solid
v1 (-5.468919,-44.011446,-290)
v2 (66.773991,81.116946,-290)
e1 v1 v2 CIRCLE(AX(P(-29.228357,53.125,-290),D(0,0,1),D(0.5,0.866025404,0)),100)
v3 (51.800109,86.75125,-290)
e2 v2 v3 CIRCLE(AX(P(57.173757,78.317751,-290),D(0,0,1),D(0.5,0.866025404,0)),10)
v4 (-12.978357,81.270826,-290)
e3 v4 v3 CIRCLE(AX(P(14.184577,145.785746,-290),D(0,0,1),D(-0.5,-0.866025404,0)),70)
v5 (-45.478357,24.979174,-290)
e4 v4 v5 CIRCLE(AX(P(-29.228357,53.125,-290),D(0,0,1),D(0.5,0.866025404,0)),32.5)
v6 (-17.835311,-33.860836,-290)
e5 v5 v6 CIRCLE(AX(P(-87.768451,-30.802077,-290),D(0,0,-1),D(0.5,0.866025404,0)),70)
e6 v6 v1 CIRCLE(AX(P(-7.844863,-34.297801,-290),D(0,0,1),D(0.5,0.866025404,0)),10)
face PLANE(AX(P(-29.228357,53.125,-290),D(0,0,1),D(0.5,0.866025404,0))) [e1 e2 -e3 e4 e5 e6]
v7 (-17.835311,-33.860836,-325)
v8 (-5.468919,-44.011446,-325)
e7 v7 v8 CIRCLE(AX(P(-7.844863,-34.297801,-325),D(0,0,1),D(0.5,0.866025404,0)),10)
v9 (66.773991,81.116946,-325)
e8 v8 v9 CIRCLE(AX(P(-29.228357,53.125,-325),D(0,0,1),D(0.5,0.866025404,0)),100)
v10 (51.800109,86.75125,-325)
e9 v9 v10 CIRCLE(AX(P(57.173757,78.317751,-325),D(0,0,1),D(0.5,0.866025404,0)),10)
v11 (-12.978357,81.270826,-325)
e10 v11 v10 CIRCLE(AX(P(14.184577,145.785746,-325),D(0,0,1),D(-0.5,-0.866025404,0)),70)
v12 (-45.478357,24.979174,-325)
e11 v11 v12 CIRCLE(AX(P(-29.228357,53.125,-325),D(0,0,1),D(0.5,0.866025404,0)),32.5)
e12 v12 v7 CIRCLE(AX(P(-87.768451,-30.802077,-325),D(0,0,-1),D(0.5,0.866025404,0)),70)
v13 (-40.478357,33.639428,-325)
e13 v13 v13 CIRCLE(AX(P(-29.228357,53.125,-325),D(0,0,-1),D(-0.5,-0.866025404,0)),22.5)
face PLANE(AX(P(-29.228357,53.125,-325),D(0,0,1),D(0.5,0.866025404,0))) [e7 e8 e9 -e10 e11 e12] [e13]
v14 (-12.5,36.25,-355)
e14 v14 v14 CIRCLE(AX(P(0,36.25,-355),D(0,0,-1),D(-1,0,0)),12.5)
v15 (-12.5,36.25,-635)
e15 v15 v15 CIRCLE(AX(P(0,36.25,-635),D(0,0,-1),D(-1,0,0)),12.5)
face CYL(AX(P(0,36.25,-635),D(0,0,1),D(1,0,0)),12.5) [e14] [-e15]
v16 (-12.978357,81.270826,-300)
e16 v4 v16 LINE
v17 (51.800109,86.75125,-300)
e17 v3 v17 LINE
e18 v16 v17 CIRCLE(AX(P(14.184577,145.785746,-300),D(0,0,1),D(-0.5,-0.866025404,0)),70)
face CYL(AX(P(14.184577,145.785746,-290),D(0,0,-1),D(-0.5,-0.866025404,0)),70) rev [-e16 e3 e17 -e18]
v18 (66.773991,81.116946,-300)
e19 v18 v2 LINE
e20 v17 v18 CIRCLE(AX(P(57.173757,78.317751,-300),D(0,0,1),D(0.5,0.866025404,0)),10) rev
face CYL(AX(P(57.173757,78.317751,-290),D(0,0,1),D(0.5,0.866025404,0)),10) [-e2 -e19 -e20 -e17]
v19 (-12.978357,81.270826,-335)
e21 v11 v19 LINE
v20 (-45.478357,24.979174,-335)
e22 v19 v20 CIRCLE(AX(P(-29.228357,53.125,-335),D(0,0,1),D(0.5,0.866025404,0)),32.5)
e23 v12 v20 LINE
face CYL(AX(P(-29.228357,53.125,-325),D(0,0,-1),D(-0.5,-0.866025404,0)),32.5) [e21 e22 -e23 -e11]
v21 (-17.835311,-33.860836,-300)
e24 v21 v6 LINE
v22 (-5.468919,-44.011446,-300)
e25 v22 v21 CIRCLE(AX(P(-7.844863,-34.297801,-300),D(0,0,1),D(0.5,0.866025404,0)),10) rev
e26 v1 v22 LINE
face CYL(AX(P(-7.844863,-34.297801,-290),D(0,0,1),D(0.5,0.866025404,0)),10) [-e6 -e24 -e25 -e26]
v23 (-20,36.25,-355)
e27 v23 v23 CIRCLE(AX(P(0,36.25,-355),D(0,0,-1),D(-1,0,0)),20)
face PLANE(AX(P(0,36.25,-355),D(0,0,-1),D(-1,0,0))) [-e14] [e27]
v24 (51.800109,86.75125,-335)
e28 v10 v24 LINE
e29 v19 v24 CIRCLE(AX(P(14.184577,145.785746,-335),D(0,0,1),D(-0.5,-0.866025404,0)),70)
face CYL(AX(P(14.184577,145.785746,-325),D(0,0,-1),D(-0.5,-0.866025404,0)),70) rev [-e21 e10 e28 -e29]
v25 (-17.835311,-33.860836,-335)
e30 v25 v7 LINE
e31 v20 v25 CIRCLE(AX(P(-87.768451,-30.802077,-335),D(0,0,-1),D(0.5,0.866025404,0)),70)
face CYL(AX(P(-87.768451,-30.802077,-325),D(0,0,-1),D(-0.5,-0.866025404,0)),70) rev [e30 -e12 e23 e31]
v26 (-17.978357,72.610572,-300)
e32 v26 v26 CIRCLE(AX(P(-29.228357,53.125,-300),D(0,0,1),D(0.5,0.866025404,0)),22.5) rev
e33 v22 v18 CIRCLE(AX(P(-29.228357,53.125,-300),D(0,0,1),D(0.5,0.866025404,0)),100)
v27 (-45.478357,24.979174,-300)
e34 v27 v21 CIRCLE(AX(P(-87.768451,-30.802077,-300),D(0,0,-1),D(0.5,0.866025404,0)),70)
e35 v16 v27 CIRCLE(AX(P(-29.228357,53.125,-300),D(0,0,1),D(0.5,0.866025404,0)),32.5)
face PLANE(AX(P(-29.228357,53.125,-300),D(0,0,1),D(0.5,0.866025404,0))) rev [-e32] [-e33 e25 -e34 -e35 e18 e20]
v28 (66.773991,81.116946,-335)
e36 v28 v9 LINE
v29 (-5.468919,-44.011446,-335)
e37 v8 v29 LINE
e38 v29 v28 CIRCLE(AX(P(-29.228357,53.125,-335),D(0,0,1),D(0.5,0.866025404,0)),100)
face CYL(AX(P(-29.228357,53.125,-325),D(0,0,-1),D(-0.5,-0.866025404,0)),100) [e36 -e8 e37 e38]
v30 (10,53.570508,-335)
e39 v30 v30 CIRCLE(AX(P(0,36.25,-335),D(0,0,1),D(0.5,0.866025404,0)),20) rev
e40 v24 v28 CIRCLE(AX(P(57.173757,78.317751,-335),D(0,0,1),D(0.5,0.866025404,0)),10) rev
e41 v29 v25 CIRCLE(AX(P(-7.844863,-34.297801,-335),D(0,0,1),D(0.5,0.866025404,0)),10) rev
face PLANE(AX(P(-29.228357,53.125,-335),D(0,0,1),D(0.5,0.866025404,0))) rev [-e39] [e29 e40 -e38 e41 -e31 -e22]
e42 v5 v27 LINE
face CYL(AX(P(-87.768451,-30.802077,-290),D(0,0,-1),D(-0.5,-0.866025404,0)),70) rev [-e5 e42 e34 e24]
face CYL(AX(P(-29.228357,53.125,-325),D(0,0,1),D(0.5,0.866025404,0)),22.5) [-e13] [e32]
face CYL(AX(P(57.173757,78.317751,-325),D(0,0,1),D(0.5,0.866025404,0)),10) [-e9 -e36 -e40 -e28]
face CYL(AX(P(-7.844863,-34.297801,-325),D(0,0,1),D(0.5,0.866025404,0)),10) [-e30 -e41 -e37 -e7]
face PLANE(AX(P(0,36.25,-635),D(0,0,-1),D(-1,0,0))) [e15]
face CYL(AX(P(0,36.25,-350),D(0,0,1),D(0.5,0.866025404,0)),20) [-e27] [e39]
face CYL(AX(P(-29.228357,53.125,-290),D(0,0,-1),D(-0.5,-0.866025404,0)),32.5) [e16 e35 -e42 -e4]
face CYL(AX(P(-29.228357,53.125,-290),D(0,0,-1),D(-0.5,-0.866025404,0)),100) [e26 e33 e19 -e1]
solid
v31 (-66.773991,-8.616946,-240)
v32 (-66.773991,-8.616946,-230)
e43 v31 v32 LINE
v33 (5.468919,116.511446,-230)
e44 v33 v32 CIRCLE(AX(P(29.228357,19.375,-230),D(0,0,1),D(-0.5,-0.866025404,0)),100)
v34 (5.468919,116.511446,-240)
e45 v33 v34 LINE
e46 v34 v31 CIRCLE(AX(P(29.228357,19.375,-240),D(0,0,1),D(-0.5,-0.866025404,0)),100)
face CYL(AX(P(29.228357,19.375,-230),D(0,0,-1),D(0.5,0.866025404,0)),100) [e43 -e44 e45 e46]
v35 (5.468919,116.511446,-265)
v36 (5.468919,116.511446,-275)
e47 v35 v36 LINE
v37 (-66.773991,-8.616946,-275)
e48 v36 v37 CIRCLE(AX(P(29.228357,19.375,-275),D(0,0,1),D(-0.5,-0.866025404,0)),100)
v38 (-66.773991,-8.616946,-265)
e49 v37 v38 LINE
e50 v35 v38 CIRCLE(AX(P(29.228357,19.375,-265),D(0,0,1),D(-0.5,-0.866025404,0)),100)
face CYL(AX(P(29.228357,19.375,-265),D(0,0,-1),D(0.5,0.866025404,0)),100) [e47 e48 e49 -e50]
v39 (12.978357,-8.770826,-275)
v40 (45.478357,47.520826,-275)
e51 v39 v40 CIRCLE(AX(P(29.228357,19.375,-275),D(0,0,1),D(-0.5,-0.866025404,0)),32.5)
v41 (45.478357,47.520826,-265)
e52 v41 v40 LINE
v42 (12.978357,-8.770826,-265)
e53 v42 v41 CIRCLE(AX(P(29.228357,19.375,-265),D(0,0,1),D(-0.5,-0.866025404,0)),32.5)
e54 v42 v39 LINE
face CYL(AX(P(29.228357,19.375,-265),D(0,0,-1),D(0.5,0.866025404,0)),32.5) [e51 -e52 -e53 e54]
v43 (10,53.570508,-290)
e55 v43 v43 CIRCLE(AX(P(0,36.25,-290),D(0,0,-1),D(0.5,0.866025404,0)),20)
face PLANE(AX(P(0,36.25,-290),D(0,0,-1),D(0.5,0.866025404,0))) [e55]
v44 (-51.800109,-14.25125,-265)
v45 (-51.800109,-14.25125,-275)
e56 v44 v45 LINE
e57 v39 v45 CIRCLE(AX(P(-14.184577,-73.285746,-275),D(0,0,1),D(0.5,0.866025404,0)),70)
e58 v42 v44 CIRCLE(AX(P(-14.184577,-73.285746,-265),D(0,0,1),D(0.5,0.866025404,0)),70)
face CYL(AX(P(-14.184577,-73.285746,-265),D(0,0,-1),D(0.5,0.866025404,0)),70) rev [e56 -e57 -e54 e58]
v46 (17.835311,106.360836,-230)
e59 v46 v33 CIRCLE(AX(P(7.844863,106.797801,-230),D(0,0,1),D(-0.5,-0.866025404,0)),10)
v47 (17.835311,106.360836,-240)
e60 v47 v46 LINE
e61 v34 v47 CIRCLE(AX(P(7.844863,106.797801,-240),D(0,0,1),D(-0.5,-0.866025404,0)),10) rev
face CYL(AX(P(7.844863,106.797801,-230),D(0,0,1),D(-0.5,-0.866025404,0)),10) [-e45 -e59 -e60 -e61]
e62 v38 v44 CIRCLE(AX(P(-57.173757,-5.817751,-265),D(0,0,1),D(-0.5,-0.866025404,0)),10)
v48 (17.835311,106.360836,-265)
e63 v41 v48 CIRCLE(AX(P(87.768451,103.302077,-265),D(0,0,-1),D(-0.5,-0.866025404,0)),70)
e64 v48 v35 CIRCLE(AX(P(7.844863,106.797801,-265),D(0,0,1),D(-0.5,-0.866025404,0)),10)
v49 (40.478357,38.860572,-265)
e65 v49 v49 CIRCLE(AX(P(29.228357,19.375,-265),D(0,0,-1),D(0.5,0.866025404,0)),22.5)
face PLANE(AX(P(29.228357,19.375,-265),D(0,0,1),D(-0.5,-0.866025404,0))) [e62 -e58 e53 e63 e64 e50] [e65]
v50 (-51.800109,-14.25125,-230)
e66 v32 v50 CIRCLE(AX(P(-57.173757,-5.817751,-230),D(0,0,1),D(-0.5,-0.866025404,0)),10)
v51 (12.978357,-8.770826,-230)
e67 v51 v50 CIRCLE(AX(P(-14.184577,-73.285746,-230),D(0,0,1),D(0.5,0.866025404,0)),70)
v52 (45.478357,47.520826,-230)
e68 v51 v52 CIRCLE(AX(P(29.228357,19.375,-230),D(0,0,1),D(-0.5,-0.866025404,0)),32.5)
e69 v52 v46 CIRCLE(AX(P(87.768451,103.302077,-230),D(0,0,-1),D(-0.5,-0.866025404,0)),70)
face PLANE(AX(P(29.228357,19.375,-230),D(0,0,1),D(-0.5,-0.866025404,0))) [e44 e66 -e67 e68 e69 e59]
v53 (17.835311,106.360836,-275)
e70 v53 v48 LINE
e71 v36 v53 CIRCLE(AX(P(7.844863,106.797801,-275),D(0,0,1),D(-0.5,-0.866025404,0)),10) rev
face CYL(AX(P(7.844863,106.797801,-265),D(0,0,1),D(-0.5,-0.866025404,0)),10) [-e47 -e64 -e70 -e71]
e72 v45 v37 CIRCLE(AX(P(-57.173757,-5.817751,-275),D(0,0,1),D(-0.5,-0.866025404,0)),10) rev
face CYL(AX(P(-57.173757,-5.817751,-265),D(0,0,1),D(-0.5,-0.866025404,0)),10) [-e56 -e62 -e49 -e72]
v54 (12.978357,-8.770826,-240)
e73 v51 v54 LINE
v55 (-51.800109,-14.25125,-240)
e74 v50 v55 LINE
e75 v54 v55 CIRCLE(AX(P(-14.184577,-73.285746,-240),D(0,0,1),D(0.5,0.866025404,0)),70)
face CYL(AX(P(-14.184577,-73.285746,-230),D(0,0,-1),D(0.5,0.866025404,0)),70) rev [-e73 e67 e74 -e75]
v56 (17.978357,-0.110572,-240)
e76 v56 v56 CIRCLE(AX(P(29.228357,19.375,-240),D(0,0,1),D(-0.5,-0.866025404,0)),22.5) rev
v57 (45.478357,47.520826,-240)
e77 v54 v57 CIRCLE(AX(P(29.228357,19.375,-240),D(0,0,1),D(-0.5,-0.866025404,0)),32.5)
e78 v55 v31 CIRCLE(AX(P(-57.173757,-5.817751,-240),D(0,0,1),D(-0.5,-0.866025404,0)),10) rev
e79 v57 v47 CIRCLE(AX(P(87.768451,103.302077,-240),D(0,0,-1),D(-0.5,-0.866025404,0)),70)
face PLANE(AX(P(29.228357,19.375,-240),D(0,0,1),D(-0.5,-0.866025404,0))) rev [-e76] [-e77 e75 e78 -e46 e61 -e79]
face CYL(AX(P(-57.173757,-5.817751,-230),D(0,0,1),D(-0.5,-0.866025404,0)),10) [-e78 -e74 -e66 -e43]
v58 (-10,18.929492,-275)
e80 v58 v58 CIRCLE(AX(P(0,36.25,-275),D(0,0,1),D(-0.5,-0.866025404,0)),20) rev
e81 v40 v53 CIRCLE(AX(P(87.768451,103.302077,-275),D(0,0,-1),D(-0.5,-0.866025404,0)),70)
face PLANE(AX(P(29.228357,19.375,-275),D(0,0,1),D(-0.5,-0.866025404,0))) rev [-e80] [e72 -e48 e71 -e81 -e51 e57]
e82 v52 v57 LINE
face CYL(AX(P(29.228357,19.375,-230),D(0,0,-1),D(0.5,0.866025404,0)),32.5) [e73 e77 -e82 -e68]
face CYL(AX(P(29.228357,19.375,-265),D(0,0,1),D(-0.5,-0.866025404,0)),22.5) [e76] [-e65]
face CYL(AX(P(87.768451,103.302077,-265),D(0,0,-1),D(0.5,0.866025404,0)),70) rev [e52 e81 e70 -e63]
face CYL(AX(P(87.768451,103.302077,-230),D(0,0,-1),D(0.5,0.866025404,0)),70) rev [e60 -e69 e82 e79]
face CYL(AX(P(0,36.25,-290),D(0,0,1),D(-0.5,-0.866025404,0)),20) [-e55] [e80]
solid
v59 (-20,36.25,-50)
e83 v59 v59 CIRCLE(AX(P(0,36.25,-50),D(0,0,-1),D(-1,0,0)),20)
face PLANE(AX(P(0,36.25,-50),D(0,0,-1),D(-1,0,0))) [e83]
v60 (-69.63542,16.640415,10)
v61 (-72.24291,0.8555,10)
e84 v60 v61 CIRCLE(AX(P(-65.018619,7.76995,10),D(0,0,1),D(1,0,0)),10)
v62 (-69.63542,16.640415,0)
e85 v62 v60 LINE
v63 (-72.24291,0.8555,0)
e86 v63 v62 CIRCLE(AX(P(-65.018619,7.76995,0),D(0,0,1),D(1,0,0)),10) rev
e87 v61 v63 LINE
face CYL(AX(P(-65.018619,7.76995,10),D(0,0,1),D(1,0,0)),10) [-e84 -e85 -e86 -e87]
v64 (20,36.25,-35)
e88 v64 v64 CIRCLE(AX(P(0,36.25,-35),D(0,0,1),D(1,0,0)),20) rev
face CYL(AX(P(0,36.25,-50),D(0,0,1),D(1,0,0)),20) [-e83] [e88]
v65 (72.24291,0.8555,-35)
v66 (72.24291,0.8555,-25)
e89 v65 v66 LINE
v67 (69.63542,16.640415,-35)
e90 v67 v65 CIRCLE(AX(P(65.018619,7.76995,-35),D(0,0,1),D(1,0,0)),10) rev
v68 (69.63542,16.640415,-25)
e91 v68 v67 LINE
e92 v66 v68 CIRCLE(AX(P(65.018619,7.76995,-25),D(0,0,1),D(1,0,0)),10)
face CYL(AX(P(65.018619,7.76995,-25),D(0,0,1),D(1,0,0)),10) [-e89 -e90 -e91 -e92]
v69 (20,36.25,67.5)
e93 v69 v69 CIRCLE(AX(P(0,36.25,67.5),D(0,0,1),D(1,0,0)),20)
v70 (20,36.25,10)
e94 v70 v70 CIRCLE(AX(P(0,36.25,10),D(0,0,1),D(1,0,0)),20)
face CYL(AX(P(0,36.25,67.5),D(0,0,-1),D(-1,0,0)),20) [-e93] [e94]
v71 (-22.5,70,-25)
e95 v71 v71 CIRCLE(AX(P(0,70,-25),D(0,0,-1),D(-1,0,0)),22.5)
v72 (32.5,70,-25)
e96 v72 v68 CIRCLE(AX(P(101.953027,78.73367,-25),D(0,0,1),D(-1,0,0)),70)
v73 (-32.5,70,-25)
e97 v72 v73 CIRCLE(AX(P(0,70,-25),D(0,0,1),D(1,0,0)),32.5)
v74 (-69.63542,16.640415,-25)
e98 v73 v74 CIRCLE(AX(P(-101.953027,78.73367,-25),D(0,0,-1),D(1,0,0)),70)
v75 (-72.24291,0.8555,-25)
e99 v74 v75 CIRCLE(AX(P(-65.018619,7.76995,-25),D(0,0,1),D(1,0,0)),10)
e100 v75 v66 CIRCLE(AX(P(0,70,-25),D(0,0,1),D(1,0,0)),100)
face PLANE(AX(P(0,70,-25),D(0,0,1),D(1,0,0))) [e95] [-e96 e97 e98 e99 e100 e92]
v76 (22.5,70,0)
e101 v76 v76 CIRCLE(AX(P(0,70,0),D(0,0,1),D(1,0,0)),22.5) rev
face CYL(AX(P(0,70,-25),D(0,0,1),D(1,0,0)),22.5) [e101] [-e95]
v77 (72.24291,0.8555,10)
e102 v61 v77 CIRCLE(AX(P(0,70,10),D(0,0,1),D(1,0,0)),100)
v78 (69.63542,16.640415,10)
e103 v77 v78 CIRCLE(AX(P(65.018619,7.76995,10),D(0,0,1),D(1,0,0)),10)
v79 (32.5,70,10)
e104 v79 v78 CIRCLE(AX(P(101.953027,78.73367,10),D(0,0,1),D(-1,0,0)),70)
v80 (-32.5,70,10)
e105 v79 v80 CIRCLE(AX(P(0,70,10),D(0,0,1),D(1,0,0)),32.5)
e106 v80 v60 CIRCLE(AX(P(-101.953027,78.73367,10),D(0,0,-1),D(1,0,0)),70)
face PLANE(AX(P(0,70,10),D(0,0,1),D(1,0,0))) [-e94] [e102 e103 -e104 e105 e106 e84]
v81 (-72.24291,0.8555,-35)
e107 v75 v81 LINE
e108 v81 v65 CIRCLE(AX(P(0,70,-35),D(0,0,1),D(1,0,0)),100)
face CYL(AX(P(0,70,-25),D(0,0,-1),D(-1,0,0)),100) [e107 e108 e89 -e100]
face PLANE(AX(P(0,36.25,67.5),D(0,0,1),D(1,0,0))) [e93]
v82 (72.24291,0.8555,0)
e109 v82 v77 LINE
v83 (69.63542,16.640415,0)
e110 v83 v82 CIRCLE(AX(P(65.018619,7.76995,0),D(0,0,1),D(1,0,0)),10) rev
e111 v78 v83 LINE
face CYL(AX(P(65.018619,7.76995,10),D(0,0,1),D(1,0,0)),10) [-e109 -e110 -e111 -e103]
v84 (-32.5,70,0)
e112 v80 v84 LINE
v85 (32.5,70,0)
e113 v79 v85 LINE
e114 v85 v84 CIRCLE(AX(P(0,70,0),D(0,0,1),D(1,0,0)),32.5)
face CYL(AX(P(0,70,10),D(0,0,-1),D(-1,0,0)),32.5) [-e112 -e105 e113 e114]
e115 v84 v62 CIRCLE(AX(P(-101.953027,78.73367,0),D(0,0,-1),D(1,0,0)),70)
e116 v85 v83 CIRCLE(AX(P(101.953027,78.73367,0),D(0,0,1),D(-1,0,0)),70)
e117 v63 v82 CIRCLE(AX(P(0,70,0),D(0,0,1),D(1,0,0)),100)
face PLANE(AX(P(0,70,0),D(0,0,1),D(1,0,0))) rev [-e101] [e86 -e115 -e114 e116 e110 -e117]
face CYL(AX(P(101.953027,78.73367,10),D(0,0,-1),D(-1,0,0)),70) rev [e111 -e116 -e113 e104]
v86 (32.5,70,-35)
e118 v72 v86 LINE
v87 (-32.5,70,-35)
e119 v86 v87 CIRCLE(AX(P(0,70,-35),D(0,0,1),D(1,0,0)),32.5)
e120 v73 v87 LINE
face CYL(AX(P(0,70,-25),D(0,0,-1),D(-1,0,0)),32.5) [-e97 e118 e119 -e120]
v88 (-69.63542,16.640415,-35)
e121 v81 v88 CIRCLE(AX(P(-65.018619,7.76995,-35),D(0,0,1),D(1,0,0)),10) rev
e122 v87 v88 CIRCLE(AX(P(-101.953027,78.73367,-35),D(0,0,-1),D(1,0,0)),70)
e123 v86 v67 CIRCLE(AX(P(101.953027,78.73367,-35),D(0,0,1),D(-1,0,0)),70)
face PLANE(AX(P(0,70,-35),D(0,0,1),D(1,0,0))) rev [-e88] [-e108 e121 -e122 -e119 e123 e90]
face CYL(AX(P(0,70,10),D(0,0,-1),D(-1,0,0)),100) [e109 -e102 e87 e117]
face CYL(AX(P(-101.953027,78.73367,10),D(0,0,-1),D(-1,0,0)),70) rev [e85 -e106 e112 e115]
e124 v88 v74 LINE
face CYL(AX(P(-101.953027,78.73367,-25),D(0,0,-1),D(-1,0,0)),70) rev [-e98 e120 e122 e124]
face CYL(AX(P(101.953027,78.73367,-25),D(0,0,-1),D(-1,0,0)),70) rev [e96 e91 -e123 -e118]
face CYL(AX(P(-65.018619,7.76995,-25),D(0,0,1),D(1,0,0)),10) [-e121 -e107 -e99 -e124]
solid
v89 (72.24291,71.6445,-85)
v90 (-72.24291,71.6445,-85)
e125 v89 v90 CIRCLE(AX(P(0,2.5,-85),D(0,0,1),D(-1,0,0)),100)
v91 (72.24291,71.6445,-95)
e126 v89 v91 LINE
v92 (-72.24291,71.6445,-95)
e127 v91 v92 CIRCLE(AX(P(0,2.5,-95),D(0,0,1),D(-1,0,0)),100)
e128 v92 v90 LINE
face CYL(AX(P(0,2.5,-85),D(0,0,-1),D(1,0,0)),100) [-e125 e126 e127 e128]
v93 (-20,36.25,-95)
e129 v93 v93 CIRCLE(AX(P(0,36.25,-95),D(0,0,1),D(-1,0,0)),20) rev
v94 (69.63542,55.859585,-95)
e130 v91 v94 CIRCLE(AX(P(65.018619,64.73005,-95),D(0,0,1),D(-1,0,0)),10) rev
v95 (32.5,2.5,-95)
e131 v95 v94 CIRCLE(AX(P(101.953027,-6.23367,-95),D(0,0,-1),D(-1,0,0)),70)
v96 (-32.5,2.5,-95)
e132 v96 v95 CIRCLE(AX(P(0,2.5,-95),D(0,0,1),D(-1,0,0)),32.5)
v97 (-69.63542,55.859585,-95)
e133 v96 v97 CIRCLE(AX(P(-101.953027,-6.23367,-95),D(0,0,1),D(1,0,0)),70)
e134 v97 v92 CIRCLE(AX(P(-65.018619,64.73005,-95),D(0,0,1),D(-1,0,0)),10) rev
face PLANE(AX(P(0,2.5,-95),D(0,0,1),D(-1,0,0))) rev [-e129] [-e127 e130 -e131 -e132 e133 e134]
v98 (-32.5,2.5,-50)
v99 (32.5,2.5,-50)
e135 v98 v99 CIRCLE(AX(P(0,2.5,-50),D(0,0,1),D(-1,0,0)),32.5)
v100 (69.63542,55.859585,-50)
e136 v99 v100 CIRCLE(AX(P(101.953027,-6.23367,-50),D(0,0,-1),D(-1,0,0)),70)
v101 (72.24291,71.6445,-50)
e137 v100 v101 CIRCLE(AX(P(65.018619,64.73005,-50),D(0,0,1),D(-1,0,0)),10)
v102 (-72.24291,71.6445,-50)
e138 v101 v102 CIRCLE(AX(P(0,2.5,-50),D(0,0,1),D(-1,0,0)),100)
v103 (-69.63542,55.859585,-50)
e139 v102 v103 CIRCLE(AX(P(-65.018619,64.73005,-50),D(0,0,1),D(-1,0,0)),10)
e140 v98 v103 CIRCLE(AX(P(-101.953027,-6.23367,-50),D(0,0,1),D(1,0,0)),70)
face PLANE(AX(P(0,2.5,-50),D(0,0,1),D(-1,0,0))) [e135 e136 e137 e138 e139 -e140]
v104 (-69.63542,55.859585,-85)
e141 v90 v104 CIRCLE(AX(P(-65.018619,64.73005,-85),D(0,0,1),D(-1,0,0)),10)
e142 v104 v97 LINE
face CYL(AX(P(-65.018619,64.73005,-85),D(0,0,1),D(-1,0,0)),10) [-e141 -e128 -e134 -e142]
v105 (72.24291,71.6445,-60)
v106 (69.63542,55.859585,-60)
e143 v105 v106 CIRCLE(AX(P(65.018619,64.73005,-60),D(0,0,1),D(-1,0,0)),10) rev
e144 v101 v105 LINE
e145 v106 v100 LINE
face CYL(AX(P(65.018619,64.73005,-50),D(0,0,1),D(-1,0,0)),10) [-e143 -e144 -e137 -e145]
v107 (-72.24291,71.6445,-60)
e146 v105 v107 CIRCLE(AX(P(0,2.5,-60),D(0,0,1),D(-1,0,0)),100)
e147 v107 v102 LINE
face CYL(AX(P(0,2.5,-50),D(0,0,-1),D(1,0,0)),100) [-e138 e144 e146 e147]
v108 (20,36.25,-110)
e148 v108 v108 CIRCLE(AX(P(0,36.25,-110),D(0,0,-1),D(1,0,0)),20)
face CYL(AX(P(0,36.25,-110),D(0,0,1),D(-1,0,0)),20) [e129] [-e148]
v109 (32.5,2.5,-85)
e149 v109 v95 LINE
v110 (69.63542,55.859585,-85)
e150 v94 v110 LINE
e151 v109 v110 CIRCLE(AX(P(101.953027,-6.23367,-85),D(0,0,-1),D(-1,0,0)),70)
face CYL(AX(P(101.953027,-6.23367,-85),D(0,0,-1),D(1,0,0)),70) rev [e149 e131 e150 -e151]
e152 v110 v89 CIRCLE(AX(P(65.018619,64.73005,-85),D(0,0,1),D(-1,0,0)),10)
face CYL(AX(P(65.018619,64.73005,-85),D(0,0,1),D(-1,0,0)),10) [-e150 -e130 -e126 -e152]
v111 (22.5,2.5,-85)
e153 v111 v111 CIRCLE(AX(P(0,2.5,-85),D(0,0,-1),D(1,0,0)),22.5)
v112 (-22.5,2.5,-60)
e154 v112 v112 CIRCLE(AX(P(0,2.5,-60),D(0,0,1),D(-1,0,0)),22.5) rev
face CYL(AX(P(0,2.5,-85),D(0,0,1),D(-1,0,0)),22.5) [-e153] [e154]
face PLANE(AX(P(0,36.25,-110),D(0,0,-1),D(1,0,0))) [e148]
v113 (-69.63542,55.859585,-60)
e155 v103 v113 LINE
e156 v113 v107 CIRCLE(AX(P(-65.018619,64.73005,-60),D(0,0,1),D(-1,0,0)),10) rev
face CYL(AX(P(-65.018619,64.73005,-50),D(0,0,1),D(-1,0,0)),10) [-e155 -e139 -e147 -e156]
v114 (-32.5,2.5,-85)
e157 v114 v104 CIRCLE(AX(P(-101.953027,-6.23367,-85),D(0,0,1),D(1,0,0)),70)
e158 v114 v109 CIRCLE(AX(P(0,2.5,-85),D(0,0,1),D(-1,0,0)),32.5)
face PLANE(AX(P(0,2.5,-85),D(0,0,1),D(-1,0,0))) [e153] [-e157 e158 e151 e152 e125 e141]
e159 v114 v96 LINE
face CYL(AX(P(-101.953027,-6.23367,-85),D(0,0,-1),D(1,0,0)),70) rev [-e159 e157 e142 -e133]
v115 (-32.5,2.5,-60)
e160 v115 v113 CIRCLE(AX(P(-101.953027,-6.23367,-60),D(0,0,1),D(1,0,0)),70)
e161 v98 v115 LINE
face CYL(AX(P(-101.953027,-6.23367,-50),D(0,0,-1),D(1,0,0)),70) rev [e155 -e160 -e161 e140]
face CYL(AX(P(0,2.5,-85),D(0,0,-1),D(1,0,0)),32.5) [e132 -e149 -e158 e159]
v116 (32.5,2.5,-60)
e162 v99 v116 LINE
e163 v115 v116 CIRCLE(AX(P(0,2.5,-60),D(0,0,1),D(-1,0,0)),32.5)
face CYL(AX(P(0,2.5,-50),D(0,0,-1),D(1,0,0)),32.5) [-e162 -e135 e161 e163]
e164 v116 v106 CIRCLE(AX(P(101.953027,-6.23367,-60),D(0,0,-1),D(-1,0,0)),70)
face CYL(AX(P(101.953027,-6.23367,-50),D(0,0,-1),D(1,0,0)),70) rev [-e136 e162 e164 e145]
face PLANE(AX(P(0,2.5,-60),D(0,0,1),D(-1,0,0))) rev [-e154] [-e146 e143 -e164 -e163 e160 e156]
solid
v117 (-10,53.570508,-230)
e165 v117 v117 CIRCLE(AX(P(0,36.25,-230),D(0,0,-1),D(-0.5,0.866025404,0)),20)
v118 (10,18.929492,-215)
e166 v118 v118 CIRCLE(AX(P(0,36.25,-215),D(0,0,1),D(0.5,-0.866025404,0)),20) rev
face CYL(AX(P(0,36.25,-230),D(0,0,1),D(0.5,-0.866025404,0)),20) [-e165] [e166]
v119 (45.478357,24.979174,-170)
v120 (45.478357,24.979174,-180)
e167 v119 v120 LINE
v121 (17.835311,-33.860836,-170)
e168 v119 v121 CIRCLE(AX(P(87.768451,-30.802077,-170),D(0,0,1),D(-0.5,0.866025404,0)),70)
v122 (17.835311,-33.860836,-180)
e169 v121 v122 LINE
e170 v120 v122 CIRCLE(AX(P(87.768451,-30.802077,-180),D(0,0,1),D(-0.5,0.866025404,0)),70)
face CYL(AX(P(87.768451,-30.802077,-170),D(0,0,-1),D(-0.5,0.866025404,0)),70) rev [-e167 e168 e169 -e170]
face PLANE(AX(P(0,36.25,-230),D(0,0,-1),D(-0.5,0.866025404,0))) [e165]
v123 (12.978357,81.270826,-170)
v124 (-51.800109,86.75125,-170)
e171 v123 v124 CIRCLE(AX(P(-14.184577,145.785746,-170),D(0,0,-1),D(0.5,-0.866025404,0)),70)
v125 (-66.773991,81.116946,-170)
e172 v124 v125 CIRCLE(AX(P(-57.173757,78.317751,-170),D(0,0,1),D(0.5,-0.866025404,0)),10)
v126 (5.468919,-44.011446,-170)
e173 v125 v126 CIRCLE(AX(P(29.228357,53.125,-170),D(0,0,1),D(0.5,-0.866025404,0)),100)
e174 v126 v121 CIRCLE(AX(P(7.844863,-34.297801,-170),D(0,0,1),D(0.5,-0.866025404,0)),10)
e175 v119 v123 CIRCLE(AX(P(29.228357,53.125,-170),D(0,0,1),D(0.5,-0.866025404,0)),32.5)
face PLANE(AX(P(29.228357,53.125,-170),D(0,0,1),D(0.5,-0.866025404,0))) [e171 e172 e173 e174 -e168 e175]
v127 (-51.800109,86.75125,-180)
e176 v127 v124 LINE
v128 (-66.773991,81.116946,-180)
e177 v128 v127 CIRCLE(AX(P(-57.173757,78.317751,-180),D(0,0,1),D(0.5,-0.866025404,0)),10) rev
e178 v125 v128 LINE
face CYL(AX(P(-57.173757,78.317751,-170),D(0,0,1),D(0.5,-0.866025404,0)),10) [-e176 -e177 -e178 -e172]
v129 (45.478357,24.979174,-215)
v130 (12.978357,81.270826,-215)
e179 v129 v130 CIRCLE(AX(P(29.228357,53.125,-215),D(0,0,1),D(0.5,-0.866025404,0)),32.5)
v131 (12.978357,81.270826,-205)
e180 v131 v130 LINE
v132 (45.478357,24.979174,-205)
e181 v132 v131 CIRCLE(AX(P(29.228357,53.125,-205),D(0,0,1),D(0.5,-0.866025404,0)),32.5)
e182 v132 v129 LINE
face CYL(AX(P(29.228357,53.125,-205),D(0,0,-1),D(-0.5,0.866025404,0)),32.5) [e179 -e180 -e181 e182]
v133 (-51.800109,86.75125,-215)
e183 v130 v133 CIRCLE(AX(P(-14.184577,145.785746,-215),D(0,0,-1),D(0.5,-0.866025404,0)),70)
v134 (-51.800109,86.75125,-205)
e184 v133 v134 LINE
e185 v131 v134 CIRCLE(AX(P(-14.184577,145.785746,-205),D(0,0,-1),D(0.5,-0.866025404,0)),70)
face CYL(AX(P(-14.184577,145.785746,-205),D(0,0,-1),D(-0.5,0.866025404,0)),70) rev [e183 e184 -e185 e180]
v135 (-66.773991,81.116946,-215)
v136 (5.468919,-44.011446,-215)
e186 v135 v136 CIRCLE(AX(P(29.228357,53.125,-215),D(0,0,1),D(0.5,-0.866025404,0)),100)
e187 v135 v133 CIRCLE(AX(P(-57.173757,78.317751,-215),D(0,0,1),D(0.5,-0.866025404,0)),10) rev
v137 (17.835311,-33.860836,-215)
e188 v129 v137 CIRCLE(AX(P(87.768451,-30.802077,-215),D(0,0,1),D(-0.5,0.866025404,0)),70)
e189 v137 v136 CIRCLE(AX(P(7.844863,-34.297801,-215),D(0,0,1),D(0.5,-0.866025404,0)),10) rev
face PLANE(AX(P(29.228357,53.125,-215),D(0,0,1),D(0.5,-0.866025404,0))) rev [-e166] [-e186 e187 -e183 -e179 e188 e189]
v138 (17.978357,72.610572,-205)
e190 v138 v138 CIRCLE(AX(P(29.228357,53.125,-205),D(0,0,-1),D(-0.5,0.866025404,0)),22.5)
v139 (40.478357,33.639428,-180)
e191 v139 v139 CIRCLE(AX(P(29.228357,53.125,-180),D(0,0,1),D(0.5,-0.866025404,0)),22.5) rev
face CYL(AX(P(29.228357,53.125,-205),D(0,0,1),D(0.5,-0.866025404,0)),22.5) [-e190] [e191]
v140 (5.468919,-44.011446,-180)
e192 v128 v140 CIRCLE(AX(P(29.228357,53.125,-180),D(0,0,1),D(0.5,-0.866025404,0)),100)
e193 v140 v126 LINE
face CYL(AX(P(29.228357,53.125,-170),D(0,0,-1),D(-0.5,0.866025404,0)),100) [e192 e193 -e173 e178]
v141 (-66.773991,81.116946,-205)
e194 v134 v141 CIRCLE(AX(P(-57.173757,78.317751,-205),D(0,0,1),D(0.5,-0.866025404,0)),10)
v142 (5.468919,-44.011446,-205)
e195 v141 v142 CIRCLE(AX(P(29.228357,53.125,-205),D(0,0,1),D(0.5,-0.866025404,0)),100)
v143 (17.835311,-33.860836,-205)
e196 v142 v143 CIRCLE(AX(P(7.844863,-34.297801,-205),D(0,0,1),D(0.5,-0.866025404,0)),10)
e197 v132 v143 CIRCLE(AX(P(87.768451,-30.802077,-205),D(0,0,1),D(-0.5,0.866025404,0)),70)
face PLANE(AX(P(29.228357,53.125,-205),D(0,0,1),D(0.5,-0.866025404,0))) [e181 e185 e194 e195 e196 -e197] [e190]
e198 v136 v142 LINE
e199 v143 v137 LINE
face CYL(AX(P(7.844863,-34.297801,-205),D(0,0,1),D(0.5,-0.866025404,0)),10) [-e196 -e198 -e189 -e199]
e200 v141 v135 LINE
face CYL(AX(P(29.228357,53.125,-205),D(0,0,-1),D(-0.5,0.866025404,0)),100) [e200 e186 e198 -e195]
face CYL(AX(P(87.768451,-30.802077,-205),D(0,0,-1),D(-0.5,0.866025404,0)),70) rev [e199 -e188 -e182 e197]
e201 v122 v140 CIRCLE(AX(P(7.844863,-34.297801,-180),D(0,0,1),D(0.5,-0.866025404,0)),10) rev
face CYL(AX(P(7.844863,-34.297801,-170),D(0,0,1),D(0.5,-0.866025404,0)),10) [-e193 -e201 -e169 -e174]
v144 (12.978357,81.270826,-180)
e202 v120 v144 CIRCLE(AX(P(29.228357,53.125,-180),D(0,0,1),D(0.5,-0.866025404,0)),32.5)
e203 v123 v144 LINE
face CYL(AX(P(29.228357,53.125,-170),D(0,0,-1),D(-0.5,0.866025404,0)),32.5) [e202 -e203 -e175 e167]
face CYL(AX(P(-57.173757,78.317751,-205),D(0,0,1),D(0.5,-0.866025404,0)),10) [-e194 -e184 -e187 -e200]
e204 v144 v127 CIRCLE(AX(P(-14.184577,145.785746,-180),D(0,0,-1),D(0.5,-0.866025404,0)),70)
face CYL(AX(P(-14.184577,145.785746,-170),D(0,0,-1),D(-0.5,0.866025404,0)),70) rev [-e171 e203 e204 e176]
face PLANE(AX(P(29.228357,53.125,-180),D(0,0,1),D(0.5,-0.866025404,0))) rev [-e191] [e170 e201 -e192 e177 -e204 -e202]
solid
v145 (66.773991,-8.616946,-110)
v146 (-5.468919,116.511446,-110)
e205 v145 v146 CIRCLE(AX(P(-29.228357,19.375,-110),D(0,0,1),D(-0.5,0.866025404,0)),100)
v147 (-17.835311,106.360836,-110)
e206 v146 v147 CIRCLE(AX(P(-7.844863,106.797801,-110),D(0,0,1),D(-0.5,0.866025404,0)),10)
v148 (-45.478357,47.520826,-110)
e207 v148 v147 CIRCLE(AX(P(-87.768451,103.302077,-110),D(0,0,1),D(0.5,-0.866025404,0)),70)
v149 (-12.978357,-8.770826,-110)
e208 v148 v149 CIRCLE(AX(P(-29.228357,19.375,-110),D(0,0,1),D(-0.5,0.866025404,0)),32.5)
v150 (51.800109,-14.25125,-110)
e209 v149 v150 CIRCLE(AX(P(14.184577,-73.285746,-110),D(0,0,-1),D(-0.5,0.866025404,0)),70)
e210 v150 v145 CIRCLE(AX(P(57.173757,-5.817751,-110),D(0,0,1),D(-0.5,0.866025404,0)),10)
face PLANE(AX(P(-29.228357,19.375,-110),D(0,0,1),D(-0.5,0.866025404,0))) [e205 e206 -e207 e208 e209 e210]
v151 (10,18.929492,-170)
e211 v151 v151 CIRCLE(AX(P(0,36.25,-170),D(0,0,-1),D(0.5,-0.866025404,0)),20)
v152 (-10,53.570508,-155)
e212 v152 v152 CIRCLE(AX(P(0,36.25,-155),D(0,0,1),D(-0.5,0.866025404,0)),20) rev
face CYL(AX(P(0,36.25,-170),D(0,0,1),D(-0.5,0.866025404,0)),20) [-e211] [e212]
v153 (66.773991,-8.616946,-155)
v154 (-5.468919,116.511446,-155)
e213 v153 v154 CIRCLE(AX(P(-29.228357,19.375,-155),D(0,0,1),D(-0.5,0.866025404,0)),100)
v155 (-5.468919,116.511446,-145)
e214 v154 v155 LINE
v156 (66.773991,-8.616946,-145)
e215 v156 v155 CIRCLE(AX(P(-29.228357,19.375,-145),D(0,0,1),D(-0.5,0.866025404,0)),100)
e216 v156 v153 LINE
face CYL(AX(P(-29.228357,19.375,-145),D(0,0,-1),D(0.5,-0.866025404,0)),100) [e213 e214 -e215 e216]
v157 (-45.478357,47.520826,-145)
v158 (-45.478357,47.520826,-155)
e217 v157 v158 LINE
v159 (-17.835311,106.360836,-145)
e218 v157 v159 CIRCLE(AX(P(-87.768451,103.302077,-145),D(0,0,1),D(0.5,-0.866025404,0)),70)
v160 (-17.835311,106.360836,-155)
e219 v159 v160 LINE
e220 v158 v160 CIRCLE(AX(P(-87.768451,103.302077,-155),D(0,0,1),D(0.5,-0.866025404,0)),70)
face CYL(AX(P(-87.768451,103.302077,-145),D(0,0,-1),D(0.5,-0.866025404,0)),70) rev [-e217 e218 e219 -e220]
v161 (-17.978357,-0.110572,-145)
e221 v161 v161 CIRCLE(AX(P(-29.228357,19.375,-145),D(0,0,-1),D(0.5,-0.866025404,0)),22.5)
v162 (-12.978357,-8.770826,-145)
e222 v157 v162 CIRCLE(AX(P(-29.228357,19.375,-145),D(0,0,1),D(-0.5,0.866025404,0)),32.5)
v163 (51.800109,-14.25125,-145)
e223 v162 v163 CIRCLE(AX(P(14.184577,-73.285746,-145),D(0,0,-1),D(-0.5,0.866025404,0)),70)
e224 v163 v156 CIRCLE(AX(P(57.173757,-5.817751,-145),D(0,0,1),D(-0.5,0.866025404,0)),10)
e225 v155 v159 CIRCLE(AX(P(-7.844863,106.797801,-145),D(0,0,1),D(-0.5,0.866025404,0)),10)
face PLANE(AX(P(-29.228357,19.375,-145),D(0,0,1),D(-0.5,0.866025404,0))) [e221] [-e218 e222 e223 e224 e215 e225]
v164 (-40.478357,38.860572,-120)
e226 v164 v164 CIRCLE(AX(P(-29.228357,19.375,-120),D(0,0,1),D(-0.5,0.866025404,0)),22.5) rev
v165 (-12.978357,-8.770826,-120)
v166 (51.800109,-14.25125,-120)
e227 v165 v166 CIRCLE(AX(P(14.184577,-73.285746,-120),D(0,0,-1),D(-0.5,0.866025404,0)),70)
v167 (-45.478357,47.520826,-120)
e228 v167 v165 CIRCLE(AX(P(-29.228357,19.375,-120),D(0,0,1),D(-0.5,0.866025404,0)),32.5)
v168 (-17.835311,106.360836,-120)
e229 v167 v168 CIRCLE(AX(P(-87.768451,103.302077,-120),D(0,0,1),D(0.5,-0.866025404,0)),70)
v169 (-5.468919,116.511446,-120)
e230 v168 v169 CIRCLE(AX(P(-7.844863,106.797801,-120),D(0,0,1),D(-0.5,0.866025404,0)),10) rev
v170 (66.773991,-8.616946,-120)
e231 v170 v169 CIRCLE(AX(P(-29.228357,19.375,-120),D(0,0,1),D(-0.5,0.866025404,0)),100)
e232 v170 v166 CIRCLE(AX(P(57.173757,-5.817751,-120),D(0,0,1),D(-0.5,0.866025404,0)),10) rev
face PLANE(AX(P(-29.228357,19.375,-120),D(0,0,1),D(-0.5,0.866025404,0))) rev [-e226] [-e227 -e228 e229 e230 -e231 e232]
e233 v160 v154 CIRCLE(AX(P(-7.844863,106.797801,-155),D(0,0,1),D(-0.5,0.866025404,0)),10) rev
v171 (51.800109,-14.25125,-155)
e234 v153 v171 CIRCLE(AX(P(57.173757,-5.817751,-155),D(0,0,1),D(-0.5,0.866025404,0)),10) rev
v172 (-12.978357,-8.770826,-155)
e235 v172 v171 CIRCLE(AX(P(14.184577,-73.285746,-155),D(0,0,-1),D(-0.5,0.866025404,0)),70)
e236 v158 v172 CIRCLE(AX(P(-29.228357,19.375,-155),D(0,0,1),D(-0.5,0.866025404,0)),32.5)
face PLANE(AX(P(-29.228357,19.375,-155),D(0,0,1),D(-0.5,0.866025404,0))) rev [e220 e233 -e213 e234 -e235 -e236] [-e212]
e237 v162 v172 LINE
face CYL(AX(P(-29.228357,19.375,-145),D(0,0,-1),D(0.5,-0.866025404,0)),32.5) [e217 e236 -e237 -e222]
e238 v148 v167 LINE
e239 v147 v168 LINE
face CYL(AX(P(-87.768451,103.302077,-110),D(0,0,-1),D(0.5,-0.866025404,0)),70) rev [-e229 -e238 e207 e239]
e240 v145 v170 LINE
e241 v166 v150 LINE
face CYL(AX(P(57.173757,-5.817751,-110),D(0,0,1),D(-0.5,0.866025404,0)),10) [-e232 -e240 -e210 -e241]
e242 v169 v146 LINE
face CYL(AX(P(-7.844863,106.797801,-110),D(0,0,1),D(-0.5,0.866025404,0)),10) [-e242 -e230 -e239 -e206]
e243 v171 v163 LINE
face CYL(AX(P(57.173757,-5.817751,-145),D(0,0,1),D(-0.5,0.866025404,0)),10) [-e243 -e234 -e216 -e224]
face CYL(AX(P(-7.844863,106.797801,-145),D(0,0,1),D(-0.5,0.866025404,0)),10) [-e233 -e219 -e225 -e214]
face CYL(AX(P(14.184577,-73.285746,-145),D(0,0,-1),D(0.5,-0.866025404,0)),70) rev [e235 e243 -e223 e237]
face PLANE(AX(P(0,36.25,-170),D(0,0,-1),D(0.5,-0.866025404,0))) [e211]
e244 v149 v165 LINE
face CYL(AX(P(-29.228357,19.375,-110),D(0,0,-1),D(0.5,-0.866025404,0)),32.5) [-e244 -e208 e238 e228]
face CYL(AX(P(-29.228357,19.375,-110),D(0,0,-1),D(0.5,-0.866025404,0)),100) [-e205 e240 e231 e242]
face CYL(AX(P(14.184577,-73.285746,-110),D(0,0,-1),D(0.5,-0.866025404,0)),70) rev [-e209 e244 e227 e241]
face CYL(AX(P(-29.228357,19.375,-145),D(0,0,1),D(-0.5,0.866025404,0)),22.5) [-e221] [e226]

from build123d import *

# Parameters (mm, degrees)
SALIENTE_EXTRUIR1_DEPTH           = 10
REDONDEO1_R                       = 10
CROQUIS2_R                        = 22.5
SALIENTE_EXTRUIR2_DEPTH           = 25
REDONDEO2_R                       = 10
REDONDEO3_R                       = 10
CROQUIS3_R                        = 20
SALIENTE_EXTRUIR3_DEPTH           = 15
S_LIDO_MOVER_COPIAR2_START        = -335
S_LIDO_MOVER_COPIAR2_DEPTH        = 10
S_LIDO_MOVER_COPIAR2_START_2      = -300
S_LIDO_MOVER_COPIAR2_2_DEPTH      = 10
S_LIDO_MOVER_COPIAR2_START_3      = -325
S_LIDO_MOVER_COPIAR2_3_OUTLINE_R  = 22.5
S_LIDO_MOVER_COPIAR2_3_DEPTH      = 25
S_LIDO_MOVER_COPIAR2_START_4      = -350
S_LIDO_MOVER_COPIAR2_4_OUTLINE_R  = 20
S_LIDO_MOVER_COPIAR2_4_DEPTH      = 15
S_LIDO_MOVER_COPIAR2_START_5      = -275
S_LIDO_MOVER_COPIAR2_5_DEPTH      = 10
S_LIDO_MOVER_COPIAR2_START_6      = -240
S_LIDO_MOVER_COPIAR2_6_DEPTH      = 10
S_LIDO_MOVER_COPIAR2_START_7      = -265
S_LIDO_MOVER_COPIAR2_7_OUTLINE_R  = 22.5
S_LIDO_MOVER_COPIAR2_7_DEPTH      = 25
S_LIDO_MOVER_COPIAR2_START_8      = -290
S_LIDO_MOVER_COPIAR2_8_OUTLINE_R  = 20
S_LIDO_MOVER_COPIAR2_8_DEPTH      = 15
S_LIDO_MOVER_COPIAR2_START_9      = -215
S_LIDO_MOVER_COPIAR2_9_DEPTH      = 10
S_LIDO_MOVER_COPIAR2_START_10     = -180
S_LIDO_MOVER_COPIAR2_10_DEPTH     = 10
S_LIDO_MOVER_COPIAR2_START_11     = -205
S_LIDO_MOVER_COPIAR2_11_OUTLINE_R = 22.5
S_LIDO_MOVER_COPIAR2_11_DEPTH     = 25
S_LIDO_MOVER_COPIAR2_START_12     = -230
S_LIDO_MOVER_COPIAR2_12_OUTLINE_R = 20
S_LIDO_MOVER_COPIAR2_12_DEPTH     = 15
S_LIDO_MOVER_COPIAR2_START_13     = -155
S_LIDO_MOVER_COPIAR2_13_DEPTH     = 10
S_LIDO_MOVER_COPIAR2_START_14     = -120
S_LIDO_MOVER_COPIAR2_14_DEPTH     = 10
S_LIDO_MOVER_COPIAR2_START_15     = -145
S_LIDO_MOVER_COPIAR2_15_OUTLINE_R = 22.5
S_LIDO_MOVER_COPIAR2_15_DEPTH     = 25
S_LIDO_MOVER_COPIAR2_START_16     = -170
S_LIDO_MOVER_COPIAR2_16_OUTLINE_R = 20
S_LIDO_MOVER_COPIAR2_16_DEPTH     = 15
S_LIDO_MOVER_COPIAR2_START_17     = -95
S_LIDO_MOVER_COPIAR2_17_DEPTH     = 10
S_LIDO_MOVER_COPIAR2_START_18     = -60
S_LIDO_MOVER_COPIAR2_18_DEPTH     = 10
S_LIDO_MOVER_COPIAR2_START_19     = -85
S_LIDO_MOVER_COPIAR2_19_OUTLINE_R = 22.5
S_LIDO_MOVER_COPIAR2_19_DEPTH     = 25
S_LIDO_MOVER_COPIAR2_START_20     = -110
S_LIDO_MOVER_COPIAR2_20_OUTLINE_R = 20
S_LIDO_MOVER_COPIAR2_20_DEPTH     = 15
S_LIDO_MOVER_COPIAR3_ANGLE        = 180
S_LIDO_MOVER_COPIAR4_ANGLE        = 120
S_LIDO_MOVER_COPIAR5_ANGLE        = 60
S_LIDO_MOVER_COPIAR6_ANGLE        = 120
S_LIDO_MOVER_COPIAR7_ANGLE        = 60
SALIENTE_EXTRUIR4_START           = 57.5
CROQUIS5_R                        = 20
SALIENTE_EXTRUIR4_DEPTH           = 57.5
CROQUIS6_R                        = 20
SALIENTE_EXTRUIR5_DEPTH           = 5
CROQUIS7_R                        = 12.5
SALIENTE_EXTRUIR6_DEPTH           = 280


# Read off the part's stored shape, not the designer's step: Sólido-Mover/Copiar2
with BuildPart() as part:
    # Croquis1 → Saliente-Extruir1 (new body)
    with BuildSketch(Plane.XY):
        with BuildLine():
            Line((0, 102.5), (0, -30))
            ThreePointArc((0, -30), (-45.736214037, -18.928053648), (-81.344649911, 11.836025489))
            ThreePointArc((-81.344649911, 11.836025489), (-48.347746455, 33.717296348), (-32.5, 70))
            ThreePointArc((-32.5, 70), (-22.980970389, 92.980970389), (0, 102.5))
        make_face()
    saliente_extruir1 = extrude(amount=SALIENTE_EXTRUIR1_DEPTH)

    # Redondeo1
    redondeo1_edges = [part.edges().sort_by_distance(p)[0] for p in [
        (-81.344649911, 11.836025489, 5),
    ]]
    fillet(redondeo1_edges, radius=REDONDEO1_R)

    # Simetría1: Saliente-Extruir1 across plane
    add(saliente_extruir1.mirror(Plane(origin=(0, 0, 0), x_dir=(0, 0, 1), z_dir=(1, 0, 0))))


with BuildPart() as body_2:
    # Sólido-Mover/Copiar1: copy of part
    add(part.part.moved(Location((0, 0, -35))))


with BuildPart() as part_1:
    add(part.part)

    add(body_2.part)  # Saliente-Extruir2 merges body 2
    # Croquis2 → Saliente-Extruir2 (add)
    with BuildSketch(Plane(origin=(0, 0, 0), x_dir=(-1, 0, 0), z_dir=(0, 0, -1))):
        with Locations(Location((0, 70, 0), (0, 0, 180))):
            Circle(CROQUIS2_R)
    extrude(amount=SALIENTE_EXTRUIR2_DEPTH)

    # Redondeo2
    redondeo2_edges = [part_1.edges().sort_by_distance(p)[0] for p in [
        (81.344649911, 11.836025489, 5),
    ]]
    fillet(redondeo2_edges, radius=REDONDEO2_R)

    # Redondeo3
    redondeo3_edges = [part_1.edges().sort_by_distance(p)[0] for p in [
        (81.344649911, 11.836025489, -30),
    ]]
    fillet(redondeo3_edges, radius=REDONDEO3_R)

    # Croquis3 → Saliente-Extruir3 (add)
    with BuildSketch(Plane(origin=(0, 0, -35), x_dir=(-1, 0, 0), z_dir=(0, 0, -1))):
        with Locations(Location((0, 36.25, 0), (0, 0, 180))):
            Circle(CROQUIS3_R)
    extrude(amount=SALIENTE_EXTRUIR3_DEPTH)

    # Croquis5 → Saliente-Extruir4 (add)
    with BuildSketch(Plane.XY.offset(10).offset(SALIENTE_EXTRUIR4_START)):
        with Locations(Location((0, 36.25, 0), (0, 0, 60))):
            Circle(CROQUIS5_R)
    extrude(amount=-SALIENTE_EXTRUIR4_DEPTH)


with BuildPart() as body_2_2:
    # Sólido-Mover/Copiar2 outline → Sólido-Mover/Copiar2 (new body)
    with BuildSketch(Plane.XY.offset(S_LIDO_MOVER_COPIAR2_START)):
        with BuildLine():
            ThreePointArc((32.5, 70), (0, 102.5), (-32.5, 70))
            ThreePointArc((-32.5, 70), (-44.497593892, 38.747757512), (-69.635420373, 16.640414851))
            ThreePointArc((-69.635420373, 16.640414851), (-74.884913013, 9.399750402), (-72.242910408, 0.855499887))
            ThreePointArc((-72.242910408, 0.855499887), (0, -30), (72.242910408, 0.855499887))
            ThreePointArc((72.242910408, 0.855499887), (74.884913013, 9.399750402), (69.635420373, 16.640414851))
            ThreePointArc((69.635420373, 16.640414851), (44.497593892, 38.747757512), (32.5, 70))
        make_face()
    extrude(amount=S_LIDO_MOVER_COPIAR2_DEPTH)

    # S_lido-Mover_Copiar2 2 outline → S_lido-Mover_Copiar2 2 (add)
    with BuildSketch(Plane.XY.offset(S_LIDO_MOVER_COPIAR2_START_2)):
        with BuildLine():
            ThreePointArc((32.5, 70), (0, 102.5), (-32.5, 70))
            ThreePointArc((-32.5, 70), (-44.497593892, 38.747757512), (-69.635420373, 16.640414851))
            ThreePointArc((-69.635420373, 16.640414851), (-74.884913013, 9.399750402), (-72.242910408, 0.855499887))
            ThreePointArc((-72.242910408, 0.855499887), (0, -30), (72.242910408, 0.855499887))
            ThreePointArc((72.242910408, 0.855499887), (74.884913013, 9.399750402), (69.635420373, 16.640414851))
            ThreePointArc((69.635420373, 16.640414851), (44.497593892, 38.747757512), (32.5, 70))
        make_face()
    extrude(amount=S_LIDO_MOVER_COPIAR2_2_DEPTH)

    # S_lido-Mover_Copiar2 3 outline → S_lido-Mover_Copiar2 3 (add)
    with BuildSketch(Plane.XY.offset(S_LIDO_MOVER_COPIAR2_START_3)):
        with Locations((0, 70)):
            Circle(S_LIDO_MOVER_COPIAR2_3_OUTLINE_R)
    extrude(amount=S_LIDO_MOVER_COPIAR2_3_DEPTH)

    # S_lido-Mover_Copiar2 4 outline → S_lido-Mover_Copiar2 4 (add)
    with BuildSketch(Plane.XY.offset(S_LIDO_MOVER_COPIAR2_START_4)):
        with Locations((0, 36.25)):
            Circle(S_LIDO_MOVER_COPIAR2_4_OUTLINE_R)
    extrude(amount=S_LIDO_MOVER_COPIAR2_4_DEPTH)


with BuildPart() as body_3:
    # S_lido-Mover_Copiar2 5 outline → S_lido-Mover_Copiar2 5 (new body)
    with BuildSketch(Plane.XY.offset(S_LIDO_MOVER_COPIAR2_START_5)):
        with BuildLine():
            ThreePointArc((32.5, 70), (0, 102.5), (-32.5, 70))
            ThreePointArc((-32.5, 70), (-44.497593892, 38.747757512), (-69.635420373, 16.640414851))
            ThreePointArc((-69.635420373, 16.640414851), (-74.884913013, 9.399750402), (-72.242910408, 0.855499887))
            ThreePointArc((-72.242910408, 0.855499887), (0, -30), (72.242910408, 0.855499887))
            ThreePointArc((72.242910408, 0.855499887), (74.884913013, 9.399750402), (69.635420373, 16.640414851))
            ThreePointArc((69.635420373, 16.640414851), (44.497593892, 38.747757512), (32.5, 70))
        make_face()
    extrude(amount=S_LIDO_MOVER_COPIAR2_5_DEPTH)

    # S_lido-Mover_Copiar2 6 outline → S_lido-Mover_Copiar2 6 (add)
    with BuildSketch(Plane.XY.offset(S_LIDO_MOVER_COPIAR2_START_6)):
        with BuildLine():
            ThreePointArc((32.5, 70), (0, 102.5), (-32.5, 70))
            ThreePointArc((-32.5, 70), (-44.497593892, 38.747757512), (-69.635420373, 16.640414851))
            ThreePointArc((-69.635420373, 16.640414851), (-74.884913013, 9.399750402), (-72.242910408, 0.855499887))
            ThreePointArc((-72.242910408, 0.855499887), (0, -30), (72.242910408, 0.855499887))
            ThreePointArc((72.242910408, 0.855499887), (74.884913013, 9.399750402), (69.635420373, 16.640414851))
            ThreePointArc((69.635420373, 16.640414851), (44.497593892, 38.747757512), (32.5, 70))
        make_face()
    extrude(amount=S_LIDO_MOVER_COPIAR2_6_DEPTH)

    # S_lido-Mover_Copiar2 7 outline → S_lido-Mover_Copiar2 7 (add)
    with BuildSketch(Plane.XY.offset(S_LIDO_MOVER_COPIAR2_START_7)):
        with Locations((0, 70)):
            Circle(S_LIDO_MOVER_COPIAR2_7_OUTLINE_R)
    extrude(amount=S_LIDO_MOVER_COPIAR2_7_DEPTH)

    # S_lido-Mover_Copiar2 8 outline → S_lido-Mover_Copiar2 8 (add)
    with BuildSketch(Plane.XY.offset(S_LIDO_MOVER_COPIAR2_START_8)):
        with Locations((0, 36.25)):
            Circle(S_LIDO_MOVER_COPIAR2_8_OUTLINE_R)
    extrude(amount=S_LIDO_MOVER_COPIAR2_8_DEPTH)


with BuildPart() as body_4:
    # S_lido-Mover_Copiar2 9 outline → S_lido-Mover_Copiar2 9 (new body)
    with BuildSketch(Plane.XY.offset(S_LIDO_MOVER_COPIAR2_START_9)):
        with BuildLine():
            ThreePointArc((32.5, 70), (0, 102.5), (-32.5, 70))
            ThreePointArc((-32.5, 70), (-44.497593892, 38.747757512), (-69.635420373, 16.640414851))
            ThreePointArc((-69.635420373, 16.640414851), (-74.884913013, 9.399750402), (-72.242910408, 0.855499887))
            ThreePointArc((-72.242910408, 0.855499887), (0, -30), (72.242910408, 0.855499887))
            ThreePointArc((72.242910408, 0.855499887), (74.884913013, 9.399750402), (69.635420373, 16.640414851))
            ThreePointArc((69.635420373, 16.640414851), (44.497593892, 38.747757512), (32.5, 70))
        make_face()
    extrude(amount=S_LIDO_MOVER_COPIAR2_9_DEPTH)

    # S_lido-Mover_Copiar2 10 outline → S_lido-Mover_Copiar2 10 (add)
    with BuildSketch(Plane.XY.offset(S_LIDO_MOVER_COPIAR2_START_10)):
        with BuildLine():
            ThreePointArc((32.5, 70), (0, 102.5), (-32.5, 70))
            ThreePointArc((-32.5, 70), (-44.497593892, 38.747757512), (-69.635420373, 16.640414851))
            ThreePointArc((-69.635420373, 16.640414851), (-74.884913013, 9.399750402), (-72.242910408, 0.855499887))
            ThreePointArc((-72.242910408, 0.855499887), (0, -30), (72.242910408, 0.855499887))
            ThreePointArc((72.242910408, 0.855499887), (74.884913013, 9.399750402), (69.635420373, 16.640414851))
            ThreePointArc((69.635420373, 16.640414851), (44.497593892, 38.747757512), (32.5, 70))
        make_face()
    extrude(amount=S_LIDO_MOVER_COPIAR2_10_DEPTH)

    # S_lido-Mover_Copiar2 11 outline → S_lido-Mover_Copiar2 11 (add)
    with BuildSketch(Plane.XY.offset(S_LIDO_MOVER_COPIAR2_START_11)):
        with Locations((0, 70)):
            Circle(S_LIDO_MOVER_COPIAR2_11_OUTLINE_R)
    extrude(amount=S_LIDO_MOVER_COPIAR2_11_DEPTH)

    # S_lido-Mover_Copiar2 12 outline → S_lido-Mover_Copiar2 12 (add)
    with BuildSketch(Plane.XY.offset(S_LIDO_MOVER_COPIAR2_START_12)):
        with Locations((0, 36.25)):
            Circle(S_LIDO_MOVER_COPIAR2_12_OUTLINE_R)
    extrude(amount=S_LIDO_MOVER_COPIAR2_12_DEPTH)


with BuildPart() as body_5:
    # S_lido-Mover_Copiar2 13 outline → S_lido-Mover_Copiar2 13 (new body)
    with BuildSketch(Plane.XY.offset(S_LIDO_MOVER_COPIAR2_START_13)):
        with BuildLine():
            ThreePointArc((32.5, 70), (0, 102.5), (-32.5, 70))
            ThreePointArc((-32.5, 70), (-44.497593892, 38.747757512), (-69.635420373, 16.640414851))
            ThreePointArc((-69.635420373, 16.640414851), (-74.884913013, 9.399750402), (-72.242910408, 0.855499887))
            ThreePointArc((-72.242910408, 0.855499887), (0, -30), (72.242910408, 0.855499887))
            ThreePointArc((72.242910408, 0.855499887), (74.884913013, 9.399750402), (69.635420373, 16.640414851))
            ThreePointArc((69.635420373, 16.640414851), (44.497593892, 38.747757512), (32.5, 70))
        make_face()
    extrude(amount=S_LIDO_MOVER_COPIAR2_13_DEPTH)

    # S_lido-Mover_Copiar2 14 outline → S_lido-Mover_Copiar2 14 (add)
    with BuildSketch(Plane.XY.offset(S_LIDO_MOVER_COPIAR2_START_14)):
        with BuildLine():
            ThreePointArc((32.5, 70), (0, 102.5), (-32.5, 70))
            ThreePointArc((-32.5, 70), (-44.497593892, 38.747757512), (-69.635420373, 16.640414851))
            ThreePointArc((-69.635420373, 16.640414851), (-74.884913013, 9.399750402), (-72.242910408, 0.855499887))
            ThreePointArc((-72.242910408, 0.855499887), (0, -30), (72.242910408, 0.855499887))
            ThreePointArc((72.242910408, 0.855499887), (74.884913013, 9.399750402), (69.635420373, 16.640414851))
            ThreePointArc((69.635420373, 16.640414851), (44.497593892, 38.747757512), (32.5, 70))
        make_face()
    extrude(amount=S_LIDO_MOVER_COPIAR2_14_DEPTH)

    # S_lido-Mover_Copiar2 15 outline → S_lido-Mover_Copiar2 15 (add)
    with BuildSketch(Plane.XY.offset(S_LIDO_MOVER_COPIAR2_START_15)):
        with Locations((0, 70)):
            Circle(S_LIDO_MOVER_COPIAR2_15_OUTLINE_R)
    extrude(amount=S_LIDO_MOVER_COPIAR2_15_DEPTH)

    # S_lido-Mover_Copiar2 16 outline → S_lido-Mover_Copiar2 16 (add)
    with BuildSketch(Plane.XY.offset(S_LIDO_MOVER_COPIAR2_START_16)):
        with Locations((0, 36.25)):
            Circle(S_LIDO_MOVER_COPIAR2_16_OUTLINE_R)
    extrude(amount=S_LIDO_MOVER_COPIAR2_16_DEPTH)


with BuildPart() as body_6:
    # S_lido-Mover_Copiar2 17 outline → S_lido-Mover_Copiar2 17 (new body)
    with BuildSketch(Plane.XY.offset(S_LIDO_MOVER_COPIAR2_START_17)):
        with BuildLine():
            ThreePointArc((32.5, 70), (0, 102.5), (-32.5, 70))
            ThreePointArc((-32.5, 70), (-44.497593892, 38.747757512), (-69.635420373, 16.640414851))
            ThreePointArc((-69.635420373, 16.640414851), (-74.884913013, 9.399750402), (-72.242910408, 0.855499887))
            ThreePointArc((-72.242910408, 0.855499887), (0, -30), (72.242910408, 0.855499887))
            ThreePointArc((72.242910408, 0.855499887), (74.884913013, 9.399750402), (69.635420373, 16.640414851))
            ThreePointArc((69.635420373, 16.640414851), (44.497593892, 38.747757512), (32.5, 70))
        make_face()
    extrude(amount=S_LIDO_MOVER_COPIAR2_17_DEPTH)

    # S_lido-Mover_Copiar2 18 outline → S_lido-Mover_Copiar2 18 (add)
    with BuildSketch(Plane.XY.offset(S_LIDO_MOVER_COPIAR2_START_18)):
        with BuildLine():
            ThreePointArc((32.5, 70), (0, 102.5), (-32.5, 70))
            ThreePointArc((-32.5, 70), (-44.497593892, 38.747757512), (-69.635420373, 16.640414851))
            ThreePointArc((-69.635420373, 16.640414851), (-74.884913013, 9.399750402), (-72.242910408, 0.855499887))
            ThreePointArc((-72.242910408, 0.855499887), (0, -30), (72.242910408, 0.855499887))
            ThreePointArc((72.242910408, 0.855499887), (74.884913013, 9.399750402), (69.635420373, 16.640414851))
            ThreePointArc((69.635420373, 16.640414851), (44.497593892, 38.747757512), (32.5, 70))
        make_face()
    extrude(amount=S_LIDO_MOVER_COPIAR2_18_DEPTH)

    # S_lido-Mover_Copiar2 19 outline → S_lido-Mover_Copiar2 19 (add)
    with BuildSketch(Plane.XY.offset(S_LIDO_MOVER_COPIAR2_START_19)):
        with Locations((0, 70)):
            Circle(S_LIDO_MOVER_COPIAR2_19_OUTLINE_R)
    extrude(amount=S_LIDO_MOVER_COPIAR2_19_DEPTH)

    # S_lido-Mover_Copiar2 20 outline → S_lido-Mover_Copiar2 20 (add)
    with BuildSketch(Plane.XY.offset(S_LIDO_MOVER_COPIAR2_START_20)):
        with Locations((0, 36.25)):
            Circle(S_LIDO_MOVER_COPIAR2_20_OUTLINE_R)
    extrude(amount=S_LIDO_MOVER_COPIAR2_20_DEPTH)


with BuildPart() as body_6_1:
    # Sólido-Mover/Copiar3: moved
    add(body_6.part.rotate(Axis((0, 36.25, 0), (0, 0, 1)), S_LIDO_MOVER_COPIAR3_ANGLE))


with BuildPart() as body_5_1:
    # Sólido-Mover/Copiar4: moved
    add(body_5.part.rotate(Axis((0, 36.25, 0), (0, 0, 1)), S_LIDO_MOVER_COPIAR4_ANGLE))


with BuildPart() as body_4_1:
    # Sólido-Mover/Copiar5: moved
    add(body_4.part.rotate(Axis((0, 36.25, 0), (0, 0, -1)), S_LIDO_MOVER_COPIAR5_ANGLE))


with BuildPart() as body_3_1:
    # Sólido-Mover/Copiar6: moved
    add(body_3.part.rotate(Axis((0, 36.25, 0), (0, 0, -1)), S_LIDO_MOVER_COPIAR6_ANGLE))


with BuildPart() as body_2_2_1:
    # Sólido-Mover/Copiar7: moved
    add(body_2_2.part.rotate(Axis((0, 36.25, 0), (0, 0, 1)), S_LIDO_MOVER_COPIAR7_ANGLE))

    # Croquis6 → Saliente-Extruir5 (add)
    with BuildSketch(Plane(origin=(0, 0, -350), x_dir=(-1, 0, 0), z_dir=(0, 0, -1))):
        with Locations(Location((0, 36.25, 0), (0, 0, 120))):
            Circle(CROQUIS6_R)
    extrude(amount=SALIENTE_EXTRUIR5_DEPTH)

    # Croquis7 → Saliente-Extruir6 (add)
    with BuildSketch(Plane(origin=(0, 0, -355), x_dir=(-1, 0, 0), z_dir=(0, 0, -1))):
        with Locations((0, 36.25)):
            Circle(CROQUIS7_R)
    extrude(amount=SALIENTE_EXTRUIR6_DEPTH)


solid = Compound([part_1.part, body_6_1.part, body_5_1.part, body_4_1.part, body_3_1.part, body_2_2_1.part])
